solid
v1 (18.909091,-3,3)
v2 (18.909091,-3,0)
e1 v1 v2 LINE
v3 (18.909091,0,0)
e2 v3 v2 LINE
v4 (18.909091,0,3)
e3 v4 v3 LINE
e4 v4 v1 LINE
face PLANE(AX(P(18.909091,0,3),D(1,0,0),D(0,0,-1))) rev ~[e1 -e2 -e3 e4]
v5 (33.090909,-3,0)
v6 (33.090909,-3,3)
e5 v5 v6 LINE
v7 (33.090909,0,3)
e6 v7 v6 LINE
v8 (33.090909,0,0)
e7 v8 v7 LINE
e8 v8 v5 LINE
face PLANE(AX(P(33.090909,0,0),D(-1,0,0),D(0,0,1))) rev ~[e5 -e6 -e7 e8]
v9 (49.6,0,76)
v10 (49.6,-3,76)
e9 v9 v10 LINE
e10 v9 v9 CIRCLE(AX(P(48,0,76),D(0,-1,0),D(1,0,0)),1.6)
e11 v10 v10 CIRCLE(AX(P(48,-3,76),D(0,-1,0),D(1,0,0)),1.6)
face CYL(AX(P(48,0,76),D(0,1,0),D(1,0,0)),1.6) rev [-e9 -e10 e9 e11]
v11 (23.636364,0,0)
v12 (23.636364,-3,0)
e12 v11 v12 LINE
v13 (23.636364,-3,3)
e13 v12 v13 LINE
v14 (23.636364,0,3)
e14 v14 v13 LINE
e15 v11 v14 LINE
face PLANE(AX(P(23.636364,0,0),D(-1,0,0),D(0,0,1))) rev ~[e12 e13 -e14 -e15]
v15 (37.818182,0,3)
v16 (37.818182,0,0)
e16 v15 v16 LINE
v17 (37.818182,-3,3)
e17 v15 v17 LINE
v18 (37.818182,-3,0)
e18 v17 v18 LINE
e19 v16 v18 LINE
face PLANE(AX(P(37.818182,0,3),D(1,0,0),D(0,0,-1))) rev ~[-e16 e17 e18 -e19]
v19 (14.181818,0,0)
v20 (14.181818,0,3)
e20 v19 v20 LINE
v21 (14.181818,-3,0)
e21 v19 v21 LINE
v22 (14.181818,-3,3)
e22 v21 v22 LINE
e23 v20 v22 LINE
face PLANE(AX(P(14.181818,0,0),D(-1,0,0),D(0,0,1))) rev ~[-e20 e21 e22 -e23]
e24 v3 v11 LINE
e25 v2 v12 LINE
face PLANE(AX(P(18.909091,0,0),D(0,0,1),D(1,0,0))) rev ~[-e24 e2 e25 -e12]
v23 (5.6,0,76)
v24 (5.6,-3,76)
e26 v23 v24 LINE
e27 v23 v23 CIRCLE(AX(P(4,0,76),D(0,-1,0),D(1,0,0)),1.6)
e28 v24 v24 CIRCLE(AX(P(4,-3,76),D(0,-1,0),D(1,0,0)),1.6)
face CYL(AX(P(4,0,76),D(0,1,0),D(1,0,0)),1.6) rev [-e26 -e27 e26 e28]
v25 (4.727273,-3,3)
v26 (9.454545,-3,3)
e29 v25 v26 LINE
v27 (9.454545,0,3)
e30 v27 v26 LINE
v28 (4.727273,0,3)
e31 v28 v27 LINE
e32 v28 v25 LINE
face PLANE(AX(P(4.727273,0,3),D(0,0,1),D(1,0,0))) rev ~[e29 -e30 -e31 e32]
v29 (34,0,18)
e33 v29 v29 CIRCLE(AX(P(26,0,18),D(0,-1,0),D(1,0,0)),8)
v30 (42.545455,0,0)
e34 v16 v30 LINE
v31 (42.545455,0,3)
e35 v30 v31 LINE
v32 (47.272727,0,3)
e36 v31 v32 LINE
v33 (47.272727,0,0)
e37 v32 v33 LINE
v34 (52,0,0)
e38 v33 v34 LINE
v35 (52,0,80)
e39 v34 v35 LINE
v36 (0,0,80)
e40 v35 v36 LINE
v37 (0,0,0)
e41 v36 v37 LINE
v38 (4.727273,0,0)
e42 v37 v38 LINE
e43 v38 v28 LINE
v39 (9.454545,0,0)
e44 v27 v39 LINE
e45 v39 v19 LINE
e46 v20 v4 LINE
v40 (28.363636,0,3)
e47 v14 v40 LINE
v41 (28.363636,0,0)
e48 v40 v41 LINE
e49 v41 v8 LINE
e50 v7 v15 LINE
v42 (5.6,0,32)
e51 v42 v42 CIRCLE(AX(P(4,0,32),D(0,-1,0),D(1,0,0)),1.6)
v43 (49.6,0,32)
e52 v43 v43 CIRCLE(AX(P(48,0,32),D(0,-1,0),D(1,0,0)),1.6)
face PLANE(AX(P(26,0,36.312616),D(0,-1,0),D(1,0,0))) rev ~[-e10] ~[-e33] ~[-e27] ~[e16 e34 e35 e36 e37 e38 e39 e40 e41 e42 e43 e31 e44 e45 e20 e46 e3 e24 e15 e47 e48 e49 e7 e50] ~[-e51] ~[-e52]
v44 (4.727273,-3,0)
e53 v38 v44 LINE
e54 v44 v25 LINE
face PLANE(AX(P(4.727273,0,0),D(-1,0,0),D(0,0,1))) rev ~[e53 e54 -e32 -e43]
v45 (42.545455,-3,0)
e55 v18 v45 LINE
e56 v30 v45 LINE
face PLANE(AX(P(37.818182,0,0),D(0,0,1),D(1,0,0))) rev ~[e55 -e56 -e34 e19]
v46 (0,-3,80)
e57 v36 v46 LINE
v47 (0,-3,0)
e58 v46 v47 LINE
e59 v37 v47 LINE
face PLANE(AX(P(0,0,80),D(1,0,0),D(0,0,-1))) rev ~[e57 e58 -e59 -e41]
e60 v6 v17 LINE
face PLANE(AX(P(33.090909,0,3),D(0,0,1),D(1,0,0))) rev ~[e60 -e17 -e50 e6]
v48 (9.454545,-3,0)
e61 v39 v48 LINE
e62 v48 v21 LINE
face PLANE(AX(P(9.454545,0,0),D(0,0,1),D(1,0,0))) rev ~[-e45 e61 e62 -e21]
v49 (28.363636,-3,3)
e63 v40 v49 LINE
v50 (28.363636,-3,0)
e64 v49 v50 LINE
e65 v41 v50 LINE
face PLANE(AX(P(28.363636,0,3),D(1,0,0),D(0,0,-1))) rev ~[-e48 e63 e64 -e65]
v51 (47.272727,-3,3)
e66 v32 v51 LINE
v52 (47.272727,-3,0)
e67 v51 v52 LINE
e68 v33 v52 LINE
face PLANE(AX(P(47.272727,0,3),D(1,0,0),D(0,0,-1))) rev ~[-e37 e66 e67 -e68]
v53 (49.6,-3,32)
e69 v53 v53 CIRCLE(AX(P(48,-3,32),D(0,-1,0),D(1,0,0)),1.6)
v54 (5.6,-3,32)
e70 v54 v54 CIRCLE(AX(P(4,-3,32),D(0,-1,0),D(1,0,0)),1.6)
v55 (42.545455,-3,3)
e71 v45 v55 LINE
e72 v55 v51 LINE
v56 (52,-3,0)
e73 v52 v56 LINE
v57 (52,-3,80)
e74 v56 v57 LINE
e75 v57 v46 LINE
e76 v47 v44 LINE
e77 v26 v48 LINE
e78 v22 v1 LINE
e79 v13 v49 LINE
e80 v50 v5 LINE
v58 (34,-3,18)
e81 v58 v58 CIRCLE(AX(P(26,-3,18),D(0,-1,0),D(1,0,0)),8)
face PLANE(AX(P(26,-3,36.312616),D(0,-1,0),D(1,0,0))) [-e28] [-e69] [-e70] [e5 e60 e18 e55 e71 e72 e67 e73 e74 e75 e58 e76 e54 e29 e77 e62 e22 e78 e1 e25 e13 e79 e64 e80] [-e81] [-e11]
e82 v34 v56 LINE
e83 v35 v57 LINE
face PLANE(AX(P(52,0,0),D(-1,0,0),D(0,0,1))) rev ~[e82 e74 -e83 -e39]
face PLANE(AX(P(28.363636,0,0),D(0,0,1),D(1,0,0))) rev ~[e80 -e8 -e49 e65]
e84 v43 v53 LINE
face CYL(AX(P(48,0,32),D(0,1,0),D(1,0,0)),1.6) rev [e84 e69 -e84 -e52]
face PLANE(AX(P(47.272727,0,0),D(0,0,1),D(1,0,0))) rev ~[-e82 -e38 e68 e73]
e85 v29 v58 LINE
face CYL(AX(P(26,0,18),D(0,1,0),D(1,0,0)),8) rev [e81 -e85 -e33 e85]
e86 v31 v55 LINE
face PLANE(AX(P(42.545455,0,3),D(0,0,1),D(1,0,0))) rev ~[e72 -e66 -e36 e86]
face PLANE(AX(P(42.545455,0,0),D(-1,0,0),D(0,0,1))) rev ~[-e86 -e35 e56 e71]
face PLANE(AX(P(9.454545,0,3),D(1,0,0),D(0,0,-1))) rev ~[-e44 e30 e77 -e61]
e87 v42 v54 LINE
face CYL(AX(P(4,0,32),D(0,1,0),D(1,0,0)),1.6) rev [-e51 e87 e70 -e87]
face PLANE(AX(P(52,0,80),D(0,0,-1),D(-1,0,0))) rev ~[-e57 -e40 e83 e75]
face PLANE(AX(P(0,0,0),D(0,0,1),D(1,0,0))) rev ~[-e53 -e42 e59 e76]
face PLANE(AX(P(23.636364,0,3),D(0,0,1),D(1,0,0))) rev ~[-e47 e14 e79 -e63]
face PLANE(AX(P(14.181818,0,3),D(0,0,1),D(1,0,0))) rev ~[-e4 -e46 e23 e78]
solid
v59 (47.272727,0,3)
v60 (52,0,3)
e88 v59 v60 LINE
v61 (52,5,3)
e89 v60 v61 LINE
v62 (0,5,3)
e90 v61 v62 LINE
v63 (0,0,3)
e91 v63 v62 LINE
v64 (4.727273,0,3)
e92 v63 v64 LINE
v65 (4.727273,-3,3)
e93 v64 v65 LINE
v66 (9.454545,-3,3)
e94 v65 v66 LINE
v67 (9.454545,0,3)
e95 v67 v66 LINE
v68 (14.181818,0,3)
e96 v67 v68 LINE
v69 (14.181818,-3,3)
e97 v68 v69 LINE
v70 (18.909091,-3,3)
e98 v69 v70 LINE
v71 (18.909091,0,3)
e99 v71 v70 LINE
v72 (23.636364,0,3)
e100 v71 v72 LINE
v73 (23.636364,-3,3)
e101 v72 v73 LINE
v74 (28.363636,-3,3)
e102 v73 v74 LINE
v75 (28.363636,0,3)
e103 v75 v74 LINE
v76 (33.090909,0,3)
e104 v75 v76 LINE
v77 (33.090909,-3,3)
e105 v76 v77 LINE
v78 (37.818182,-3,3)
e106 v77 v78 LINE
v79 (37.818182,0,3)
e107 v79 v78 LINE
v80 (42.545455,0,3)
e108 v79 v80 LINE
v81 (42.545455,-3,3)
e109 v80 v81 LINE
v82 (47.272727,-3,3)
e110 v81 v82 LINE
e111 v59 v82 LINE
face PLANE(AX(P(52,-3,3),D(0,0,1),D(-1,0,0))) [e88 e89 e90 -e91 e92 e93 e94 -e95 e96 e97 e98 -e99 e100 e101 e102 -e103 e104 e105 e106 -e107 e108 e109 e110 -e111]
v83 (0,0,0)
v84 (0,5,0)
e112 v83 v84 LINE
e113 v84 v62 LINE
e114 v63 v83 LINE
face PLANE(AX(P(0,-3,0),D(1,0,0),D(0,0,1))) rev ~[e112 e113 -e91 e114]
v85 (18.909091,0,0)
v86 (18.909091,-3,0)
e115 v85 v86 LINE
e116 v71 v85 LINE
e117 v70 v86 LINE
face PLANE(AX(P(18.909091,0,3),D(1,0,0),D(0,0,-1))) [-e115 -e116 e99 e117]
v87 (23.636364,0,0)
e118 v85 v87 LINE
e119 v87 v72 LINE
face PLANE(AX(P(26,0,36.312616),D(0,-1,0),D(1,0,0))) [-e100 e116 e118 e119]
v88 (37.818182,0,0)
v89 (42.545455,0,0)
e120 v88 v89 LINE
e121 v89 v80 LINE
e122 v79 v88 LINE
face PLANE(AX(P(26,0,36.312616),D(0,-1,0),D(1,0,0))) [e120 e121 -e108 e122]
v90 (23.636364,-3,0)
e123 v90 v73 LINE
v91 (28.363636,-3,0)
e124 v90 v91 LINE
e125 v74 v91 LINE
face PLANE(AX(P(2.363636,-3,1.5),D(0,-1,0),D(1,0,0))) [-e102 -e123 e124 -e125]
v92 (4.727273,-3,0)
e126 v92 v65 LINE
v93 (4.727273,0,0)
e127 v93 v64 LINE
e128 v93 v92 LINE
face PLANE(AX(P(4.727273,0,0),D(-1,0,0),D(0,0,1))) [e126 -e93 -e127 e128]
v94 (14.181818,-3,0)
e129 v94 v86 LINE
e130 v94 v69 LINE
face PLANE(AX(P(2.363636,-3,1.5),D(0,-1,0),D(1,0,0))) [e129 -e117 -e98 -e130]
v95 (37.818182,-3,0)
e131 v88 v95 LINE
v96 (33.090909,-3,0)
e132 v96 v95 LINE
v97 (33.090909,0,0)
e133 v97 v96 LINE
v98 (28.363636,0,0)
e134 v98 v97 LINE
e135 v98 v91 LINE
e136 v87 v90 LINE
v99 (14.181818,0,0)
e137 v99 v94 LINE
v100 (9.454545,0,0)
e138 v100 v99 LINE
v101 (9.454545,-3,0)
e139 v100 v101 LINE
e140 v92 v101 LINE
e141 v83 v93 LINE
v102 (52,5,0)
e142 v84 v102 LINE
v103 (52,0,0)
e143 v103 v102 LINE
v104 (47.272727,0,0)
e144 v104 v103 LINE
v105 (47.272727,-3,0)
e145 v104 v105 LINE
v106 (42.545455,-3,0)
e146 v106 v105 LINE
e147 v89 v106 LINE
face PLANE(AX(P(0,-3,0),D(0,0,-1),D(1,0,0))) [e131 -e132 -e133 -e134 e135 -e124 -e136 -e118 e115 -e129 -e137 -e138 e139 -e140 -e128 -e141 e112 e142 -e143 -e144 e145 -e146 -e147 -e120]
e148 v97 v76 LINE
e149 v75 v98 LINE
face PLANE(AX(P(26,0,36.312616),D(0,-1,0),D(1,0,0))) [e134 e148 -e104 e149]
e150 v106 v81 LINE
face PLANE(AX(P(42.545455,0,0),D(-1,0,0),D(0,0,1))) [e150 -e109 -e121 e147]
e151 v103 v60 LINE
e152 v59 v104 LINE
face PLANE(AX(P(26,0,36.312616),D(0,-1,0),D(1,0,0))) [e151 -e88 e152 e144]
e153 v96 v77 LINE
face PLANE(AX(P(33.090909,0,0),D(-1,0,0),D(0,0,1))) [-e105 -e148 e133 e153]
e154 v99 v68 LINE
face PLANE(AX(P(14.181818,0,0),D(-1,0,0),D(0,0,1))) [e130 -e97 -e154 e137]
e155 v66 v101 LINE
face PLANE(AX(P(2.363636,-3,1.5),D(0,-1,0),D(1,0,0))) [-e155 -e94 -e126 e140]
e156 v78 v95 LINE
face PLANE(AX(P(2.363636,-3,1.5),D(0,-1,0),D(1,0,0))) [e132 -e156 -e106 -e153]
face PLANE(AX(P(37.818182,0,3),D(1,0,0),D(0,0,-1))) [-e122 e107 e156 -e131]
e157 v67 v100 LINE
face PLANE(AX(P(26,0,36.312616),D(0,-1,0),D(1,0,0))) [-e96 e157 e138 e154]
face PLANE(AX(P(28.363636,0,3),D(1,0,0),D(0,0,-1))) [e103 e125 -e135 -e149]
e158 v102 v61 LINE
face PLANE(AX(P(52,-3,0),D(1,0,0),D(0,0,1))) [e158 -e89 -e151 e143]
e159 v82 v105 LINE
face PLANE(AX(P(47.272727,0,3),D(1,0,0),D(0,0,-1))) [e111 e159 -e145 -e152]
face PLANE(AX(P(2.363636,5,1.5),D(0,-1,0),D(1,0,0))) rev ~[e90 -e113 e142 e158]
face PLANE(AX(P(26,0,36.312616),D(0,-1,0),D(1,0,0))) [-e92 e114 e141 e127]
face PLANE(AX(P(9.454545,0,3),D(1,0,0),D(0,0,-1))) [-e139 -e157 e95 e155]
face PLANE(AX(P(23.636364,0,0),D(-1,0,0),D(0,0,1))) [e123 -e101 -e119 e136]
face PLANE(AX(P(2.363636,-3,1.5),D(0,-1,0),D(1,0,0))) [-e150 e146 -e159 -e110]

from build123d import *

# Parameters (mm, degrees)
F0_R     = 1.6
F0_R_2   = 8
F1_DEPTH = 3
F2_W     = 4.7272727273
F2_H     = 3
F3_DEPTH = 8


# Not quite as in the source:
# - a feature names something its author has since deleted; it is built from what else it names


with BuildPart() as f1:
    # F0 (on Front) → F1 (new body)
    with BuildSketch(Plane.XZ):
        Polygon((0, 80), (0, 0), (4.7272727273, 0), (4.7272727273, 3), (9.4545454545, 3), (9.4545454545, 0), (14.1818181818, 0), (14.1818181818, 3), (18.9090909091, 3), (18.9090909091, 0), (23.6363636364, 0), (23.6363636364, 3), (28.3636363636, 3), (28.3636363636, 0), (33.0909090909, 0), (33.0909090909, 3), (37.8181818182, 3), (37.8181818182, 0), (42.5454545455, 0), (42.5454545455, 3), (47.2727272727, 3), (47.2727272727, 0), (52, 0), (52, 80), align=None)
        with Locations((4, 32)):
            Circle(F0_R, mode=Mode.SUBTRACT)
        with Locations((26, 18)):
            Circle(F0_R_2, mode=Mode.SUBTRACT)
        with Locations((48, 32)):
            Circle(F0_R, mode=Mode.SUBTRACT)
        with Locations((4, 76)):
            Circle(F0_R, mode=Mode.SUBTRACT)
        with Locations((48, 76)):
            Circle(F0_R, mode=Mode.SUBTRACT)
    extrude(amount=F1_DEPTH)


with BuildPart() as f3:
    # F2 (on face) → F3 (new body)
    with BuildSketch(Plane.XZ.offset(3)):
        with Locations((2.3636363636, 1.5)):
            Rectangle(F2_W, F2_H)
        with Locations((7.0909090909, 1.5)):
            Rectangle(F2_W, F2_H)
        with Locations((11.8181818182, 1.5)):
            Rectangle(F2_W, F2_H)
        with Locations((16.5454545455, 1.5)):
            Rectangle(F2_W, F2_H)
        with Locations((21.2727272727, 1.5)):
            Rectangle(F2_W, F2_H)
        with Locations((26, 1.5)):
            Rectangle(F2_W, F2_H)
        with Locations((30.7272727273, 1.5)):
            Rectangle(F2_W, F2_H)
        with Locations((35.4545454545, 1.5)):
            Rectangle(F2_W, F2_H)
        with Locations((40.1818181818, 1.5)):
            Rectangle(F2_W, F2_H)
        with Locations((44.9090909091, 1.5)):
            Rectangle(F2_W, F2_H)
        with Locations((49.6363636364, 1.5)):
            Rectangle(F2_W, F2_H)
    extrude(amount=-F3_DEPTH)

    # F4: cut F1
    add(f1.part, mode=Mode.SUBTRACT)


solid = Compound([f1.part, f3.part])
